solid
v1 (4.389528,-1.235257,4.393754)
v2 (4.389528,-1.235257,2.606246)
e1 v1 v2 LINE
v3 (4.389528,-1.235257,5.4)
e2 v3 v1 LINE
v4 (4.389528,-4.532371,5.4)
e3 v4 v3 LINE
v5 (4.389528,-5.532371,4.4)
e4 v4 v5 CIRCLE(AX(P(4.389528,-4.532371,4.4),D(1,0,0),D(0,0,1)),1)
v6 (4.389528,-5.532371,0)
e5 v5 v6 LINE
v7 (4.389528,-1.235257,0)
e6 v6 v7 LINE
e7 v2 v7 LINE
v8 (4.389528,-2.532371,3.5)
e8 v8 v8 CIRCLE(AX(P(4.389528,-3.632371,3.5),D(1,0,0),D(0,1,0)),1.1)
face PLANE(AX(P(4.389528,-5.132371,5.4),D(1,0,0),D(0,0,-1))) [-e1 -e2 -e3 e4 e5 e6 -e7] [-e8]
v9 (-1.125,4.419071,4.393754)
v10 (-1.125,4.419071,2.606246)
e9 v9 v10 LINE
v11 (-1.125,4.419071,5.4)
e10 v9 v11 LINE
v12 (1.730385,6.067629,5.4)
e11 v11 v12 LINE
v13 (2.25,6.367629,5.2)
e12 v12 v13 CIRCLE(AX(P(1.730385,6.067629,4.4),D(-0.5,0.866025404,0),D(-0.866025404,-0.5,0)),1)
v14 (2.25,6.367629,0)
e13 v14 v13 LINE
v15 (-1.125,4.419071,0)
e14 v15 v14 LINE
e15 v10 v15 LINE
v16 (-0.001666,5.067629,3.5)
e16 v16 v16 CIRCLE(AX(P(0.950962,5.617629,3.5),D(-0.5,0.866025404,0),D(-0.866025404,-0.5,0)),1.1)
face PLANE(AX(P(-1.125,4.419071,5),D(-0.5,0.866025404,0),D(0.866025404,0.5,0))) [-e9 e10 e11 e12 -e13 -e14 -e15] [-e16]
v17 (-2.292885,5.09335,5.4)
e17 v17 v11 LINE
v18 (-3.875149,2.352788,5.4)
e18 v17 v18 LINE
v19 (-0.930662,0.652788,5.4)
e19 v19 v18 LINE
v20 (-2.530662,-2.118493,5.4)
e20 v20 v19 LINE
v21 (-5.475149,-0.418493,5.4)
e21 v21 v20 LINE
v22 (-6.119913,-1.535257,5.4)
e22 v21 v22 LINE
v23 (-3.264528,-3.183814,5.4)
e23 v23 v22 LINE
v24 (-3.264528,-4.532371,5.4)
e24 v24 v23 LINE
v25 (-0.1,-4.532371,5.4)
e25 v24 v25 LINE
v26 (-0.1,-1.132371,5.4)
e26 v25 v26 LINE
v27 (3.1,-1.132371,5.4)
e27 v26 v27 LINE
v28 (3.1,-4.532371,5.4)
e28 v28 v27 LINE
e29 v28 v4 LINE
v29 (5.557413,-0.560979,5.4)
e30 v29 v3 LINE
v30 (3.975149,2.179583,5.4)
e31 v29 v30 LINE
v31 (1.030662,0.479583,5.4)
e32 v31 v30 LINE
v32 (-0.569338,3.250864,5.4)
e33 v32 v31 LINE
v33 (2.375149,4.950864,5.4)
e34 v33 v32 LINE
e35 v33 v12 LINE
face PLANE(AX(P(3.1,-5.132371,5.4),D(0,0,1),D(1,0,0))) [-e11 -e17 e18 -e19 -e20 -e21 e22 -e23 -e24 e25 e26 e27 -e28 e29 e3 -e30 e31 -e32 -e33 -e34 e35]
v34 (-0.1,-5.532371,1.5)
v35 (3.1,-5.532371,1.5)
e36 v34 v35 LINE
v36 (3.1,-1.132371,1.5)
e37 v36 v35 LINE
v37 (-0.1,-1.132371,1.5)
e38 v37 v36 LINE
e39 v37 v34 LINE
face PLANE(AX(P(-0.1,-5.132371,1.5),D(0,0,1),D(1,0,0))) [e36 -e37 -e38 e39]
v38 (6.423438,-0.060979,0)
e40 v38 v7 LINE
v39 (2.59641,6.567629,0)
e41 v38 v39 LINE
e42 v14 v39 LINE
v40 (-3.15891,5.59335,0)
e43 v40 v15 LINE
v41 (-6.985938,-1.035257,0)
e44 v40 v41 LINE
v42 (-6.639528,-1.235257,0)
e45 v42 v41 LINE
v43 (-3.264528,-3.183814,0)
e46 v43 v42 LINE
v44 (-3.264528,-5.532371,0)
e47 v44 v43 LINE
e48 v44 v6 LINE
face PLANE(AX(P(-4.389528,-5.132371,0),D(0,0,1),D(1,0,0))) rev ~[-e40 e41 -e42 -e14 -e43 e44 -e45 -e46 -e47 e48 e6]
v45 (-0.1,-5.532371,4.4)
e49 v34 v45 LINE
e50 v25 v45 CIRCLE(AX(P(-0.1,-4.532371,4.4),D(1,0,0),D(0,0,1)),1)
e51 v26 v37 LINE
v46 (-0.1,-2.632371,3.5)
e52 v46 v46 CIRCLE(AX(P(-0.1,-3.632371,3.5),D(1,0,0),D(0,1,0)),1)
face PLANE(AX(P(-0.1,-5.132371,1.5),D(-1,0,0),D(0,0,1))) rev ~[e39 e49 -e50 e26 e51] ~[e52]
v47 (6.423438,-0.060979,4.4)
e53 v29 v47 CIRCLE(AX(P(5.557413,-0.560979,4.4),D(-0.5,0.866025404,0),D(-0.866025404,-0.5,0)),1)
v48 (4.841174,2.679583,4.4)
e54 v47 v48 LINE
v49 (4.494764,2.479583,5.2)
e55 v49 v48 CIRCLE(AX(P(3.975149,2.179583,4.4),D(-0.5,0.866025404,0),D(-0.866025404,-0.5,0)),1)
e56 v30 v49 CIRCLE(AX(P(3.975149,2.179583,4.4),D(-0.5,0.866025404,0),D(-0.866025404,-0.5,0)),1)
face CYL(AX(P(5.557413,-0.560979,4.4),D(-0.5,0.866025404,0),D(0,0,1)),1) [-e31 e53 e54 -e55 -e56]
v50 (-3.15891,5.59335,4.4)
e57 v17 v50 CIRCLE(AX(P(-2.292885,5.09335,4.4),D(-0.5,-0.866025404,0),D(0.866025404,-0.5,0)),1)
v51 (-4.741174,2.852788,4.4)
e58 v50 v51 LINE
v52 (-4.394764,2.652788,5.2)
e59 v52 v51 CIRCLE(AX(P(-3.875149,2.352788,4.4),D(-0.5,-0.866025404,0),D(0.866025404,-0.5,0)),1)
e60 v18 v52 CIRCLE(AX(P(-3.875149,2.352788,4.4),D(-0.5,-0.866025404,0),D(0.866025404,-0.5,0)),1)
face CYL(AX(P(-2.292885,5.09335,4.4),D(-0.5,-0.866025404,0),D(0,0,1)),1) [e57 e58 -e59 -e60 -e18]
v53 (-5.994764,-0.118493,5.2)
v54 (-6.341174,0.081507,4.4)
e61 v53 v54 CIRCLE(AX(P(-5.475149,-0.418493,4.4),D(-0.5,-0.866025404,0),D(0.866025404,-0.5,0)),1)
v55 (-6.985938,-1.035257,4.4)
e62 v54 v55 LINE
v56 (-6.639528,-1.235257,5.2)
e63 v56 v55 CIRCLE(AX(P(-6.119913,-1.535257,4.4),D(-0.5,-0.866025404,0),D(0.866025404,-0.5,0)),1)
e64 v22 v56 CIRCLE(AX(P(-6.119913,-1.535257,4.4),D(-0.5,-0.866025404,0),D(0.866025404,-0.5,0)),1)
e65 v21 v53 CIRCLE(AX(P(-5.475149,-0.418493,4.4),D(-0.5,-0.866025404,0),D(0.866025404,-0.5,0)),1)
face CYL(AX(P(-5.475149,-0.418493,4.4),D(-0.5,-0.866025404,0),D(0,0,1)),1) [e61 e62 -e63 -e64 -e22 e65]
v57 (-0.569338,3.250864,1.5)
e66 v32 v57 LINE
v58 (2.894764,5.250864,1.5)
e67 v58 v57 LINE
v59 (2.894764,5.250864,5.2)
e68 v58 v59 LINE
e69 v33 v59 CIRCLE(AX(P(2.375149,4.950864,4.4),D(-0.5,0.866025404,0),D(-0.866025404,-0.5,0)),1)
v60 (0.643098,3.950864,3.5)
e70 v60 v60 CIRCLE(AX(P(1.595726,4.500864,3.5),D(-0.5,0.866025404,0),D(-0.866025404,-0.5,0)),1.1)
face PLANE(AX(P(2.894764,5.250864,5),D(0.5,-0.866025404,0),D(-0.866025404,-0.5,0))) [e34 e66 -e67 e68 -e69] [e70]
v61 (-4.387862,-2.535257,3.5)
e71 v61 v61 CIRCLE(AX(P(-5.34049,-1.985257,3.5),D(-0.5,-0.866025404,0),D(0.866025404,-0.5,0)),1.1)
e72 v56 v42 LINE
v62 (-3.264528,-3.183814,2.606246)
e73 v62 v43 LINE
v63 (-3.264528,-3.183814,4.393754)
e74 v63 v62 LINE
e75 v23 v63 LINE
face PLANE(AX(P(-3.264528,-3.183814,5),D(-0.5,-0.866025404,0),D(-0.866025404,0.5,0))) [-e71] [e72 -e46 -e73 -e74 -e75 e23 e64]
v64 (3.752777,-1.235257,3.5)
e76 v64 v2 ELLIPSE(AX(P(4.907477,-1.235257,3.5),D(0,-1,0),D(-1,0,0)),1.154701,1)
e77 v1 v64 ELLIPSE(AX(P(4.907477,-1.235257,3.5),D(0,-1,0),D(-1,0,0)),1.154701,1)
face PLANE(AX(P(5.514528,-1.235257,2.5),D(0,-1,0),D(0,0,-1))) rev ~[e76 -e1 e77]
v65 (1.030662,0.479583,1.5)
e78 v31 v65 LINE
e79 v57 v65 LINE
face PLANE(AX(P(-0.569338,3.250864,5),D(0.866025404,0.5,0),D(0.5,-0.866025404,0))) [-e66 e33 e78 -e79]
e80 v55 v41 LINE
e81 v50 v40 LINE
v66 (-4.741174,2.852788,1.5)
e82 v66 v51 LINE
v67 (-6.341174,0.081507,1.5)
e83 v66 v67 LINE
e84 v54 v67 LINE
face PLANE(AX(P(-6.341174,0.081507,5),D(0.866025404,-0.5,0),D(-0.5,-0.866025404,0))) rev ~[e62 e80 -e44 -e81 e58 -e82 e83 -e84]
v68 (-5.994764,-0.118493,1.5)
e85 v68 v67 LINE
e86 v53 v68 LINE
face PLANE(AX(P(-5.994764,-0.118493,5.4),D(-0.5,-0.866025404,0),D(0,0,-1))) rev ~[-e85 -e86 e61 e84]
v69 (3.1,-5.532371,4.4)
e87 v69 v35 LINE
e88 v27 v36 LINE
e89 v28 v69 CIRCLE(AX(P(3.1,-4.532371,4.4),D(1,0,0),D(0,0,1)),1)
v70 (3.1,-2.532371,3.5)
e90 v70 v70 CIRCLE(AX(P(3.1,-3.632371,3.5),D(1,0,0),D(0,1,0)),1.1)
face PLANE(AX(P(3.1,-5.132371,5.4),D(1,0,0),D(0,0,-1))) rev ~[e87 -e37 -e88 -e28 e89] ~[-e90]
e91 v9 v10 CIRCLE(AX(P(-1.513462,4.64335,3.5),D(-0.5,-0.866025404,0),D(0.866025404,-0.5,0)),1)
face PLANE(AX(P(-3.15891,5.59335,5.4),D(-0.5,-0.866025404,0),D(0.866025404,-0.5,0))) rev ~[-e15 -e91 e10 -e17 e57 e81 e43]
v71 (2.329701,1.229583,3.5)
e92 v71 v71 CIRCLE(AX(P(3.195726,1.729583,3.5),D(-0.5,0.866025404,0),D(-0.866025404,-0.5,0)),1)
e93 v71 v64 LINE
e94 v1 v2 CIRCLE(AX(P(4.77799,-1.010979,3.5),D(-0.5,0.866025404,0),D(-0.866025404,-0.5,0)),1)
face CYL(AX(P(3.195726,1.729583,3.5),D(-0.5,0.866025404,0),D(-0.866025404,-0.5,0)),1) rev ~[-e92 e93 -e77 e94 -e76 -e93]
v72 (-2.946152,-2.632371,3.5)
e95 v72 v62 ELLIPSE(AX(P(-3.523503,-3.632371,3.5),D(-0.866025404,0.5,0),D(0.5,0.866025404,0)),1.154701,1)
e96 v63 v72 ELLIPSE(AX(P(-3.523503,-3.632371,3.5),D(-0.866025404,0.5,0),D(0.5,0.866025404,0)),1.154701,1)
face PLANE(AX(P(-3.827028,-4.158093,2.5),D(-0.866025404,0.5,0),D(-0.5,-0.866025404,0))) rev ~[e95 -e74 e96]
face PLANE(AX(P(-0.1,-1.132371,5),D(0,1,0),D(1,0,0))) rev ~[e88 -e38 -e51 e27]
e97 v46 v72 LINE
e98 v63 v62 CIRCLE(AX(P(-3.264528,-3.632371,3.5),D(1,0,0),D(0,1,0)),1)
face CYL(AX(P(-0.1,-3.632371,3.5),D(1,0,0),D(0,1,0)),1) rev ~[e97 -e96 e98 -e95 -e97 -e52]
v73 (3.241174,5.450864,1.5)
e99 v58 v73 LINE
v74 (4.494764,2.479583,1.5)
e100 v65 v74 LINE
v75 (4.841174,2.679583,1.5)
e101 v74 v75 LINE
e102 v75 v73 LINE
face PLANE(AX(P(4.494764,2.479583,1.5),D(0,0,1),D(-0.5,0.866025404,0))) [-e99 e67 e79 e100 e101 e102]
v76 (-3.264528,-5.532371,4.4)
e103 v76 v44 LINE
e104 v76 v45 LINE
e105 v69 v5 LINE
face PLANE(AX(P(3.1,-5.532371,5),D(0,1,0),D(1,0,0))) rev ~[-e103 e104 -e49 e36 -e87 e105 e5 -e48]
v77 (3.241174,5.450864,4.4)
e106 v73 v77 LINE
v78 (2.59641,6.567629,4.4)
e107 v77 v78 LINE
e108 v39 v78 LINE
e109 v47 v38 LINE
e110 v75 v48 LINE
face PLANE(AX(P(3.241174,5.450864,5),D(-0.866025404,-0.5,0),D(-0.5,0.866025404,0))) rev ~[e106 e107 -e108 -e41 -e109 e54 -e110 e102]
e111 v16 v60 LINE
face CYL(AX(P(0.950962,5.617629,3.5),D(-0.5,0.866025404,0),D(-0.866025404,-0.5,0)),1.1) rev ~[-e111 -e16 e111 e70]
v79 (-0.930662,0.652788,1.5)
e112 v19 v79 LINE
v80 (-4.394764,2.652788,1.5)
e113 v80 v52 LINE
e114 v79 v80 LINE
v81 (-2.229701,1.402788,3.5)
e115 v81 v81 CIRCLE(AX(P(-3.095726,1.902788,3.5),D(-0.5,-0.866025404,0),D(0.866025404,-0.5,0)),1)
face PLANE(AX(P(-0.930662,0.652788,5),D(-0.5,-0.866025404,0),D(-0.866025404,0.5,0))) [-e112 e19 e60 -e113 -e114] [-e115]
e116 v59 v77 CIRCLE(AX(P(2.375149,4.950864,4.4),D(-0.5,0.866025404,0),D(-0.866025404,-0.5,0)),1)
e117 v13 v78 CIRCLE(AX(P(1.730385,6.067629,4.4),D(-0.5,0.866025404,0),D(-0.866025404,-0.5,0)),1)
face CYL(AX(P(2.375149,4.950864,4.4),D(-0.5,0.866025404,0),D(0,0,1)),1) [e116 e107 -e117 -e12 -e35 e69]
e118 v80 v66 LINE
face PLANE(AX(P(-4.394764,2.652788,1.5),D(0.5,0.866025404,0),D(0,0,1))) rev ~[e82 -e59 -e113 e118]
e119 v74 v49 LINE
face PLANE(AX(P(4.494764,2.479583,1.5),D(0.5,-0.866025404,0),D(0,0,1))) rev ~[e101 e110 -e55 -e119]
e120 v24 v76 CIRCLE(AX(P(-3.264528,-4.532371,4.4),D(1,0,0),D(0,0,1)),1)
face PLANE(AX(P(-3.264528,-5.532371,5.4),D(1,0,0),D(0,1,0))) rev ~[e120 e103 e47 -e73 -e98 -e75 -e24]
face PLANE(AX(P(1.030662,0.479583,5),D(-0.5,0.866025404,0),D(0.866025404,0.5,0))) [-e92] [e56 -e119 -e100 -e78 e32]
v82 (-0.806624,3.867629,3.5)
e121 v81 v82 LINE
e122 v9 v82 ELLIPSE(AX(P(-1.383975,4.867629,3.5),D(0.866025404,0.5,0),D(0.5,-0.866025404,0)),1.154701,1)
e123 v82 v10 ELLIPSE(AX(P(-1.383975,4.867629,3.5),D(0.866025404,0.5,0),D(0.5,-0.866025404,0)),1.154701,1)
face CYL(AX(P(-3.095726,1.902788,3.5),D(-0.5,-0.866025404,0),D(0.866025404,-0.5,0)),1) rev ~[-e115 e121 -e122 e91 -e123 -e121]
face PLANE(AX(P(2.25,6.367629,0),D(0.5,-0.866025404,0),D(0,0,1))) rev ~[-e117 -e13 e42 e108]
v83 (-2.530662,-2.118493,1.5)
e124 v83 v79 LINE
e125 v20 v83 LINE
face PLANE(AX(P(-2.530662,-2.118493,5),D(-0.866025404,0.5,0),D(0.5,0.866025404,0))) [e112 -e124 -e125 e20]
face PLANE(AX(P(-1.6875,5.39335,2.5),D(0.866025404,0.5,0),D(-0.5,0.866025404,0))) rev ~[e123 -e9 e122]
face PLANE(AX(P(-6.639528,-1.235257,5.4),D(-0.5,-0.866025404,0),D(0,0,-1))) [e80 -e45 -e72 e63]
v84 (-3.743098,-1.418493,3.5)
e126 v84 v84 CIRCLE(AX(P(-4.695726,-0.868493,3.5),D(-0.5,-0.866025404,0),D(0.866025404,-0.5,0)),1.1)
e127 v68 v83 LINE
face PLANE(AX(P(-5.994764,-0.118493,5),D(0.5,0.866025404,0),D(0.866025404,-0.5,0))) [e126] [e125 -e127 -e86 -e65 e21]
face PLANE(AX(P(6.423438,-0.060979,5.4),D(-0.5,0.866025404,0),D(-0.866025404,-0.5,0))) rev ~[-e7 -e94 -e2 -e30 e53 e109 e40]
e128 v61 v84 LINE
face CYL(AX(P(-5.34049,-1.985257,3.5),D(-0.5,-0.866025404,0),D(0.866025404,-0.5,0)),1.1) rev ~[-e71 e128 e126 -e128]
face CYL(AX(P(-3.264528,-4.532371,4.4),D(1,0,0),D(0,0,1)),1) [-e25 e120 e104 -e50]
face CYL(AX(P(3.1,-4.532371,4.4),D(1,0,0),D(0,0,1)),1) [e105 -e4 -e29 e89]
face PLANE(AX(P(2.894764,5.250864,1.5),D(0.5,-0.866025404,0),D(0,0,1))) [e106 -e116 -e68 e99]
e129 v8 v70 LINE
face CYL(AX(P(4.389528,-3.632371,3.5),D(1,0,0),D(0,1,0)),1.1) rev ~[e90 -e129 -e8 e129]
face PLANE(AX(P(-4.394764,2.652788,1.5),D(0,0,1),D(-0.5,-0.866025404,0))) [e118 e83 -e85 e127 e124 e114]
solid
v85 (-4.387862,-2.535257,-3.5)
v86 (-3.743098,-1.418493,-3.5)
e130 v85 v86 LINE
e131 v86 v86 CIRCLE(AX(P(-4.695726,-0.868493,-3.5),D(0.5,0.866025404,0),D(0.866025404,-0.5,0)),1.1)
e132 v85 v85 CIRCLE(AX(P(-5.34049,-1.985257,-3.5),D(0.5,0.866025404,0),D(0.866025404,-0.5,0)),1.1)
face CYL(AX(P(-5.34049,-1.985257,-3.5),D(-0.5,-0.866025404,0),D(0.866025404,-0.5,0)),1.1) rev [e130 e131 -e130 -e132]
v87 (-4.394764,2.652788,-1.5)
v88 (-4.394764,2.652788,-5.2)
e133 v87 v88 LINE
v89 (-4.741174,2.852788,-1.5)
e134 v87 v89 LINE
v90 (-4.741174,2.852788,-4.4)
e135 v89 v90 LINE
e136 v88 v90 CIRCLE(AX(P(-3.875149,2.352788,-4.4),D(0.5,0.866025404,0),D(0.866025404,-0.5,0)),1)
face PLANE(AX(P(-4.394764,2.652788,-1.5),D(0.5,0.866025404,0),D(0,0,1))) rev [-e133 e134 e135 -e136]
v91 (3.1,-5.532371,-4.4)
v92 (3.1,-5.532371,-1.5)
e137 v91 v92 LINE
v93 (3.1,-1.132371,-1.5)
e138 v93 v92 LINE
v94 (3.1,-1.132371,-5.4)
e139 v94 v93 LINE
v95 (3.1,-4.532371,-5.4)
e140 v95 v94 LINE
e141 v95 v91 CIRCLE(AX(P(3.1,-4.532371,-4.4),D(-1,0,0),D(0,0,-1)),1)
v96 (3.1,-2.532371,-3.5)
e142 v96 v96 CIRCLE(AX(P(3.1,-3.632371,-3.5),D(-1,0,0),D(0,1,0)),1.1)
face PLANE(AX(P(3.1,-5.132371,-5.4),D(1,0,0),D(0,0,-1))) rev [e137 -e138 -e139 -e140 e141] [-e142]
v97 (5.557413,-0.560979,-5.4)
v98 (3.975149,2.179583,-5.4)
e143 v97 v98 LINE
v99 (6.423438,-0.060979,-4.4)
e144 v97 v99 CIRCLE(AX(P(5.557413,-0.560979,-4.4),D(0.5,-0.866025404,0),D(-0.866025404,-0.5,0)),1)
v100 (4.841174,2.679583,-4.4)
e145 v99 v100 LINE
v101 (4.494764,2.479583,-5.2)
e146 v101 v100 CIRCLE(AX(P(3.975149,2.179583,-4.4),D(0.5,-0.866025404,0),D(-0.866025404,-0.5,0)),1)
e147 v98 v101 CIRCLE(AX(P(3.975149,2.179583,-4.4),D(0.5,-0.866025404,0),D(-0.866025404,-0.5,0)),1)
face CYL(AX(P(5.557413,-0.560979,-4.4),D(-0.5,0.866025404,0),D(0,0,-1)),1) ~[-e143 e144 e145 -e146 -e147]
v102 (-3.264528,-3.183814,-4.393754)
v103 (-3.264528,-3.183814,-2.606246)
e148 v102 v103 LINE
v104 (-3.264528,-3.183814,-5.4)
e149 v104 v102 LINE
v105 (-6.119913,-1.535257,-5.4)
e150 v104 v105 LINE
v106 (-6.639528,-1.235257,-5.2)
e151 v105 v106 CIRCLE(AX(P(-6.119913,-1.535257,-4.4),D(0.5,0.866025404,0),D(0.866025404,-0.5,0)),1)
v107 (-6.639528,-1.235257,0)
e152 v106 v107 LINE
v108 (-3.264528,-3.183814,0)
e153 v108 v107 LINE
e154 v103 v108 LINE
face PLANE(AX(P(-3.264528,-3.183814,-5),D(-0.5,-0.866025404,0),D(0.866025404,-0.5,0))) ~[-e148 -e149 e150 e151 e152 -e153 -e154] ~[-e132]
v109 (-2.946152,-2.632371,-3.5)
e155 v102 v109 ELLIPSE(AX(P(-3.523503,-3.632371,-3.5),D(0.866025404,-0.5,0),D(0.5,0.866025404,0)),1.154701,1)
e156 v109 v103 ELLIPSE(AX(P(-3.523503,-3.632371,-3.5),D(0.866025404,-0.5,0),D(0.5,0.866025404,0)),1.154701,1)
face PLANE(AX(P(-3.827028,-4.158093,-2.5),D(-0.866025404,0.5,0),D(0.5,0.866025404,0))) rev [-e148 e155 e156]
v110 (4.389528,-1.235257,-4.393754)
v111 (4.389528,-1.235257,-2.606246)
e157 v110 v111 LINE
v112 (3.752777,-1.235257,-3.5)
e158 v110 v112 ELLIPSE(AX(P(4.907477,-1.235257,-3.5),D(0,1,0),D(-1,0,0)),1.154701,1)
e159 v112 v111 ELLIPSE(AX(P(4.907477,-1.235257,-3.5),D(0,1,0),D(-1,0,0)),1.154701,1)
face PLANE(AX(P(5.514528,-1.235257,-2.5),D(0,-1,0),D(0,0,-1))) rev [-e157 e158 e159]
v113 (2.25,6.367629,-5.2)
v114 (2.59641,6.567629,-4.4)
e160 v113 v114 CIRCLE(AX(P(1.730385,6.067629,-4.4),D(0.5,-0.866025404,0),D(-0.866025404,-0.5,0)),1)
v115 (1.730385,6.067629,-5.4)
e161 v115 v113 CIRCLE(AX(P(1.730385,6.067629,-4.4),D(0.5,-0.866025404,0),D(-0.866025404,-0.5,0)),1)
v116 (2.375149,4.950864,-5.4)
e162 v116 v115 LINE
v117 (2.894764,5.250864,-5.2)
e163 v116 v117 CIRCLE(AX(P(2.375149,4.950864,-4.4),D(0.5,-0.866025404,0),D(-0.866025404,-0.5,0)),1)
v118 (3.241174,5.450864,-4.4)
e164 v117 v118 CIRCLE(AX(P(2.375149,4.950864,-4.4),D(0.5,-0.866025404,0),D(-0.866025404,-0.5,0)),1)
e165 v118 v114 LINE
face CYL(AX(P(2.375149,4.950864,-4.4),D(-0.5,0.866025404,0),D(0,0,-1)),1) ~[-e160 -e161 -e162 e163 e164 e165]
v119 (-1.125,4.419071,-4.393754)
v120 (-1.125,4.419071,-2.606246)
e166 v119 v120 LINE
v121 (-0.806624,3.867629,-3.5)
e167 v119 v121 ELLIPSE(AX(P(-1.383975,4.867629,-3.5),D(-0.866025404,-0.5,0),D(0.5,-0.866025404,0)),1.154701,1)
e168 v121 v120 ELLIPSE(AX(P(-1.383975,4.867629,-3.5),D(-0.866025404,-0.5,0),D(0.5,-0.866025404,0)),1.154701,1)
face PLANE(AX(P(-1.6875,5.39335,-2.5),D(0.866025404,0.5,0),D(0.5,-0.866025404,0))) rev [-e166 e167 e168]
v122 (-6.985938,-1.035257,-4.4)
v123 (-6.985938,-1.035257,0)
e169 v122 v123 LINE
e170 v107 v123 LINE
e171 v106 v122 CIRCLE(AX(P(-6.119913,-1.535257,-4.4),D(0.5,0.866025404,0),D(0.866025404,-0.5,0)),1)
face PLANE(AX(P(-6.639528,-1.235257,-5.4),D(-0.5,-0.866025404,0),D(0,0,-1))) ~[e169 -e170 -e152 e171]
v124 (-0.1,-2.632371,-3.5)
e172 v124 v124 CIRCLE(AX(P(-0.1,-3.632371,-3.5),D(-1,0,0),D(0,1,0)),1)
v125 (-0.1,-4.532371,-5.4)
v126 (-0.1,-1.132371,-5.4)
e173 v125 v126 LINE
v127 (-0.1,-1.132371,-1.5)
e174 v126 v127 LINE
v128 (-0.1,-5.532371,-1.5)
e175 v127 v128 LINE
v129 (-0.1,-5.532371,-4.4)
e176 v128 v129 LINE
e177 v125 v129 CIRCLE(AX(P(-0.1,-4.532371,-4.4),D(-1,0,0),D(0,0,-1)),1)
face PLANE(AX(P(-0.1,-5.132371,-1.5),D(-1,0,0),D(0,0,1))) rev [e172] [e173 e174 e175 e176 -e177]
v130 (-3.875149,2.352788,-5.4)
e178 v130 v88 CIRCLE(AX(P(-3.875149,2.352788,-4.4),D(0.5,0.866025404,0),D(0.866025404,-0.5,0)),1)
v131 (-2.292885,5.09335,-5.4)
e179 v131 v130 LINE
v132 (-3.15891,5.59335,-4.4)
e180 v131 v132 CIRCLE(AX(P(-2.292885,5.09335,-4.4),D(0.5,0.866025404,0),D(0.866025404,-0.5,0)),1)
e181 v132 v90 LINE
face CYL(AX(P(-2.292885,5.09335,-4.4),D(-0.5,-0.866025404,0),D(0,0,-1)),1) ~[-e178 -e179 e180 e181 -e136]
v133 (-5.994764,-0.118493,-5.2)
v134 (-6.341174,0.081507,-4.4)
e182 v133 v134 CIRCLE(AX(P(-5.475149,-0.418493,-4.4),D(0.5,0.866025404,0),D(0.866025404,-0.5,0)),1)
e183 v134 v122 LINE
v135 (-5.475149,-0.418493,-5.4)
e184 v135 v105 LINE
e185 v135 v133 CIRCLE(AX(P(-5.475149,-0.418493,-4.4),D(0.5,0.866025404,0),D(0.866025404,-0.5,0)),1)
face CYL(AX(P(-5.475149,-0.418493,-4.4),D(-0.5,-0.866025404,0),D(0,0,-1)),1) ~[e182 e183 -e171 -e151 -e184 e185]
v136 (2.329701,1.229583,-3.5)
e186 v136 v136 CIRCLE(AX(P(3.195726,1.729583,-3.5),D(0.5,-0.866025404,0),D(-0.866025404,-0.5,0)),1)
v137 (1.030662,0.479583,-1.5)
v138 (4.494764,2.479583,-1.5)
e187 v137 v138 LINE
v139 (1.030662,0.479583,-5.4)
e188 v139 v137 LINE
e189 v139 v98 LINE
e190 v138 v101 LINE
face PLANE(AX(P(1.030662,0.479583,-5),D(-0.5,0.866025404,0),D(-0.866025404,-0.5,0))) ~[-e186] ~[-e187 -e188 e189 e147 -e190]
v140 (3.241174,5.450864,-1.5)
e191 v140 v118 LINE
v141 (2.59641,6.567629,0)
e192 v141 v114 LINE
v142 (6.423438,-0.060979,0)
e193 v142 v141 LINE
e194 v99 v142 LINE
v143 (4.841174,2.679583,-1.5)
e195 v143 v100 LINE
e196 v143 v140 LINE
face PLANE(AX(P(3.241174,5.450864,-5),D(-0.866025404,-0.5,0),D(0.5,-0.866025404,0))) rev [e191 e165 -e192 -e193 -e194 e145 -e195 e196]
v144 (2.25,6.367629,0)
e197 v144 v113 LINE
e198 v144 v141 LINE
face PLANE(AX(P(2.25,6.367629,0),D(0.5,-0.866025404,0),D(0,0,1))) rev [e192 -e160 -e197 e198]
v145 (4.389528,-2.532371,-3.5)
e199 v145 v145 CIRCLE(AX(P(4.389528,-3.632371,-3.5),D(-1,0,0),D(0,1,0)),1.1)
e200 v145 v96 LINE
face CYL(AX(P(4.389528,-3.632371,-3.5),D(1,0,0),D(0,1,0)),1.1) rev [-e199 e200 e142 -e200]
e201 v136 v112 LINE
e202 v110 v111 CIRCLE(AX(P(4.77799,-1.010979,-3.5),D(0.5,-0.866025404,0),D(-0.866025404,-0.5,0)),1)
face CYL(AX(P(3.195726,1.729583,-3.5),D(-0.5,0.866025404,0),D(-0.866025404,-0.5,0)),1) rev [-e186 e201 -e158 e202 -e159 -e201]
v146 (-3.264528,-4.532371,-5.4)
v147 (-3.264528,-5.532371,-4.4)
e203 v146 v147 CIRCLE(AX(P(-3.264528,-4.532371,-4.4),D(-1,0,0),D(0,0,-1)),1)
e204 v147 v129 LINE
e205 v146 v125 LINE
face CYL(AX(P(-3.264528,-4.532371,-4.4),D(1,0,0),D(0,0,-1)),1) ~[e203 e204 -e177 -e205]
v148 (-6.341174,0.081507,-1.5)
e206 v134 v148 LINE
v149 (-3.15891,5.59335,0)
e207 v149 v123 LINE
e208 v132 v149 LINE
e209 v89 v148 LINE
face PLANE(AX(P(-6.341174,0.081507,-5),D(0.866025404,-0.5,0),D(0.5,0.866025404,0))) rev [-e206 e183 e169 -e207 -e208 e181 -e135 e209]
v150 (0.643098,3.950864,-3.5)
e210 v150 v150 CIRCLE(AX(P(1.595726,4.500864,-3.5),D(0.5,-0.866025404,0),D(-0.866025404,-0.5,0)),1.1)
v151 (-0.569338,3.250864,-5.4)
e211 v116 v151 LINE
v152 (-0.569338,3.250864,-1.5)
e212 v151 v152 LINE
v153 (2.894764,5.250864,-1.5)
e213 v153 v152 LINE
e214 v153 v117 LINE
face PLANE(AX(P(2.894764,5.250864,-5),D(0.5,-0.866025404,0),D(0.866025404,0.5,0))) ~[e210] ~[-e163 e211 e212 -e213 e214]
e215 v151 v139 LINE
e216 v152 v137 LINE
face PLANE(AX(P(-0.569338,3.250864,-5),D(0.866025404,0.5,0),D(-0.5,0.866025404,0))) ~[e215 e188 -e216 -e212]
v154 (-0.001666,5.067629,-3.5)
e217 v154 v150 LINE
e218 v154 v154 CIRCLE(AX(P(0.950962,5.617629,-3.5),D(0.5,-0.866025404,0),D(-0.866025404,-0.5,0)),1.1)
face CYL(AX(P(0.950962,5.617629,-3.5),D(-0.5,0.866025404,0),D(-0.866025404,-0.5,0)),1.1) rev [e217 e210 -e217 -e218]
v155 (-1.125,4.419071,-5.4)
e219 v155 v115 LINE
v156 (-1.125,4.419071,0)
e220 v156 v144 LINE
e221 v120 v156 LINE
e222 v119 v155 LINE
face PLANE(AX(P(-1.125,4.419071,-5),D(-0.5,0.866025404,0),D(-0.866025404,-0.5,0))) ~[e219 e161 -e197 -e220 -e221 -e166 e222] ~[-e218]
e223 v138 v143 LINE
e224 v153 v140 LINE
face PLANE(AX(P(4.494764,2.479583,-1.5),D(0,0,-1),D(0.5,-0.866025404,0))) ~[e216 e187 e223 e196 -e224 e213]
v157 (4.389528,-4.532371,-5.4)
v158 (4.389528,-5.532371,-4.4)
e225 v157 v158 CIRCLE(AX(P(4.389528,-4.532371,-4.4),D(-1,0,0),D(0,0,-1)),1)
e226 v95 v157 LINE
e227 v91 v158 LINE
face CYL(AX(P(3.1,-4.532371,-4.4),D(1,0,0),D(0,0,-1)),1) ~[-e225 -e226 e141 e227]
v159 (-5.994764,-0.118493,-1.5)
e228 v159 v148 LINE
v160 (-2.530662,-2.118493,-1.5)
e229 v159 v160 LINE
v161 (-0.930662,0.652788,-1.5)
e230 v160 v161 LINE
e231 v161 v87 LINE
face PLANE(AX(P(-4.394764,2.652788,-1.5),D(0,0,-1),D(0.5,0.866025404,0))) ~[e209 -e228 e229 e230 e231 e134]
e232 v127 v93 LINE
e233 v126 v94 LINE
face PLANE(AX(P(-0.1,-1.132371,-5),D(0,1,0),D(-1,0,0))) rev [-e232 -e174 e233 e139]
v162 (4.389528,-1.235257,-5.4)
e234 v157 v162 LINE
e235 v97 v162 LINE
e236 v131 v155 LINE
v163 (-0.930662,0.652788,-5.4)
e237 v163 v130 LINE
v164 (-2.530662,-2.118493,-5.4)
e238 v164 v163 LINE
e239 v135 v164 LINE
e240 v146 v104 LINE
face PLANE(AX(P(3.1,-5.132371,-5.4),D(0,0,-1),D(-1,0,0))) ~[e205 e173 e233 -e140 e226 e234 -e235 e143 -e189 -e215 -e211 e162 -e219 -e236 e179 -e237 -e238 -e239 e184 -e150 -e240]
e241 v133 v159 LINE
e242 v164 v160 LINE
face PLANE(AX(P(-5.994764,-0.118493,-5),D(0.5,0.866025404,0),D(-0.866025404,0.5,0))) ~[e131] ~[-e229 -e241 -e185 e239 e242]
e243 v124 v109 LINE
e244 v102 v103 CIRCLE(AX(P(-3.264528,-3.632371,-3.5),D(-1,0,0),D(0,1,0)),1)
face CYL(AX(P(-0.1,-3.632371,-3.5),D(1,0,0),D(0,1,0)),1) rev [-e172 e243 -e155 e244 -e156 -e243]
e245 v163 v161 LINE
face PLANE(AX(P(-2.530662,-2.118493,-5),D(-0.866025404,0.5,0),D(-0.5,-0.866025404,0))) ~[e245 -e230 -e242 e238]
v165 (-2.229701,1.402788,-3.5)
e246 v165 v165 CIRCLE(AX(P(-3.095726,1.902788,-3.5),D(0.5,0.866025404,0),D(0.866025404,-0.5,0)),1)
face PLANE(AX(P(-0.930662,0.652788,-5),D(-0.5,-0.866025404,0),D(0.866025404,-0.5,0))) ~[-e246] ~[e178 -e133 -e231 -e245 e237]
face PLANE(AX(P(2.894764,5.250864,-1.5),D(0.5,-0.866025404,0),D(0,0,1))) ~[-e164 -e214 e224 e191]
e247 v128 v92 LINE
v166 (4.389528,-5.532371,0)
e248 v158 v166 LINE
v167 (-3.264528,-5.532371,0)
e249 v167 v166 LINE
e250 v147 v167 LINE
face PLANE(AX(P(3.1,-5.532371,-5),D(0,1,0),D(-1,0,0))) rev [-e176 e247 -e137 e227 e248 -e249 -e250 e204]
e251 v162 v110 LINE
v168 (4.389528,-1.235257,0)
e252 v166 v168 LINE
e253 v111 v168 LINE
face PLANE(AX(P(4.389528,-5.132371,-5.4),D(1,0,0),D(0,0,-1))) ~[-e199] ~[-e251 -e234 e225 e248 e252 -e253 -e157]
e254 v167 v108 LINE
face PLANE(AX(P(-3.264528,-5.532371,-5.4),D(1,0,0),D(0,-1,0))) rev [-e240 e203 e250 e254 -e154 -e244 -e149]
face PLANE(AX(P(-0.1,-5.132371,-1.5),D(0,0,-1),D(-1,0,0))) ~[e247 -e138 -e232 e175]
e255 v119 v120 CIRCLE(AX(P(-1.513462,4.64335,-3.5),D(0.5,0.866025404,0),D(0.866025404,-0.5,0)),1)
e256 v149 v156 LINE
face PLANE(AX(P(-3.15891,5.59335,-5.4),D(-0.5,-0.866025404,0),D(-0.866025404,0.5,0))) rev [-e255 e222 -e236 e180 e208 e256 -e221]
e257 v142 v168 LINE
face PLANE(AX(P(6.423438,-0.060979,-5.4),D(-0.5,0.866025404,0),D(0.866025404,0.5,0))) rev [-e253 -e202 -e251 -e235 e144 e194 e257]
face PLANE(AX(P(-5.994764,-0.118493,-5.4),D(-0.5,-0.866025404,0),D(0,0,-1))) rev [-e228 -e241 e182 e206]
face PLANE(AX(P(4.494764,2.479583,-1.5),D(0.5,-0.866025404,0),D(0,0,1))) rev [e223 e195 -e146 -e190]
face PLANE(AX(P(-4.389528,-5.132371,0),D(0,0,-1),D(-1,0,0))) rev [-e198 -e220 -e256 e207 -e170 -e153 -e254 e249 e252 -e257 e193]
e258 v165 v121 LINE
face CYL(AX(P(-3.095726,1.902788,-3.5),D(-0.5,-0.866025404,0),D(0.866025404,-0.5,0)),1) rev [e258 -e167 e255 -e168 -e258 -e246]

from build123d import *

# Parameters (mm, degrees)
F1_DEPTH  = 5
F2_W      = 3.2
F2_H      = 4
F3_DEPTH  = 3.5
F4_W      = 2.25
F4_H      = 3.897114317
F5_DEPTH  = 5
F6_R      = 1.1
F8_DEPTH  = 1.2895280957
F7_R      = 1.1
F10_DEPTH = 1.2895280957
F9_R      = 1.1
F11_DEPTH = 1.2895280957
F12_R     = 1
F15_REACH = 9.3689552204
F13_R     = 1
F16_REACH = 10.4939552204
F14_R     = 1
F17_REACH = 11.5637192683
F18_DEPTH = 0.4
F19_DEPTH = 0.4
F20_DEPTH = 0.4
F21_DEPTH = 0.4
F22_W     = 1.125
F22_H     = 2.3485571585
F23_DEPTH = 5.4
F24_R     = 1


with BuildPart() as f1:
    # F0 (on Top) → F1 (new body)
    with BuildSketch(Plane.XY):
        Polygon((2.25, 6.367628561), (-2.25, 6.367628561), (-6.6395280957, -1.235257122), (-4.3895280957, -5.132371439), (4.3895280957, -5.132371439), (6.6395280957, -1.235257122), align=None)
    extrude(amount=F1_DEPTH)

    # F2 (on face) → F3 (cut)
    with BuildSketch(Plane.XY.offset(5)):
        with Locations((1.5, -3.132371439)):
            Rectangle(F2_W, F2_H)
        Polygon((4.4947640478, 2.4795831791), (2.8947640478, 5.2508644712), (-0.5693375673, 3.2508644712), (1.0306624327, 0.4795831791), align=None)
        Polygon((-4.3947640478, 2.6527882599), (-5.9947640478, -0.1184930322), (-2.5306624327, -2.1184930322), (-0.9306624327, 0.6527882599), align=None)
    extrude(amount=-F3_DEPTH, mode=Mode.SUBTRACT)

    # F4 (on face) → F5 (cut, through all)
    with BuildSketch(Plane.XY.offset(5)):
        with Locations((5.5145280957, -3.1838142805)):
            Rectangle(F4_W, F4_H)
        Polygon((-1.125, 4.4190714025), (2.25, 6.367628561), (1.125, 8.3161857195), (-2.25, 6.367628561), align=None)
        Polygon((-3.2645280957, -3.1838142805), (-6.6395280957, -1.235257122), (-7.7645280957, -3.1838142805), (-4.3895280957, -5.132371439), align=None)
    extrude(amount=-F5_DEPTH, mode=Mode.SUBTRACT)

    # F6 (on face) → F8 (cut, through all)
    with BuildSketch(Plane(origin=(-2.1947640478, -3.8014428415, 0), x_dir=(0.8660254038, -0.5, 0), z_dir=(-0.5, -0.8660254038, 0))):
        with Locations((-3.632371439, 3.5)):
            Circle(F6_R)
    extrude(amount=-F8_DEPTH, mode=Mode.SUBTRACT)

    # F7 (on face) → F10 (cut, through all)
    with BuildSketch(Plane.YZ.offset(4.3895280957)):
        with Locations((-3.632371439, 3.5)):
            Circle(F7_R)
    extrude(amount=-F10_DEPTH, mode=Mode.SUBTRACT)

    # F9 (on face) → F11 (cut, through all)
    with BuildSketch(Plane(origin=(-2.1947640478, 3.8014428415, 0), x_dir=(-0.8660254038, -0.5, 0), z_dir=(-0.5, 0.8660254038, 0))):
        with Locations((-3.632371439, 3.5)):
            Circle(F9_R)
    extrude(amount=-F11_DEPTH, mode=Mode.SUBTRACT)

    f15_end = Plane(origin=(-3.8270280957, -4.1580928598, 2.5), x_dir=(-0.5, -0.8660254038, 0), z_dir=(-0.8660254038, 0.5, 0))
    # F12 (on face) → F15 (cut, up to a plane its end follows)
    with BuildSketch(Plane.YZ.offset(-0.1)):
        with Locations((-3.632371439, 3.5)):
            Circle(F12_R)
    f15_long = extrude(amount=-F15_REACH, mode=Mode.PRIVATE)
    add(split(f15_long, bisect_by=f15_end, keep=Keep.BOTTOM, mode=Mode.PRIVATE), mode=Mode.SUBTRACT)

    f16_end = Plane(origin=(5.5145280957, -1.235257122, 2.5), x_dir=(0, 0, -1), z_dir=(0, -1, 0))
    # F13 (on face) → F16 (cut, up to a plane its end follows)
    with BuildSketch(Plane(origin=(0.05, -0.0866025404, 0), x_dir=(-0.8660254038, -0.5, 0), z_dir=(-0.5, 0.8660254038, 0))):
        with Locations((-3.632371439, 3.5)):
            Circle(F13_R)
    f16_long = extrude(amount=-F16_REACH, mode=Mode.PRIVATE)
    add(split(f16_long, bisect_by=f16_end, keep=Keep.BOTTOM, mode=Mode.PRIVATE), mode=Mode.SUBTRACT)

    f17_end = Plane(origin=(-1.6875, 5.3933499817, 2.5), x_dir=(-0.5, 0.8660254038, 0), z_dir=(0.8660254038, 0.5, 0))
    # F14 (on face) → F17 (cut, up to a plane its end follows)
    with BuildSketch(Plane(origin=(0.05, 0.0866025404, 0), x_dir=(0.8660254038, -0.5, 0), z_dir=(-0.5, -0.8660254038, 0))):
        with Locations((-3.632371439, 3.5)):
            Circle(F14_R)
    f17_long = extrude(amount=-F17_REACH, mode=Mode.PRIVATE)
    add(split(f17_long, bisect_by=f17_end, keep=Keep.BOTTOM, mode=Mode.PRIVATE), mode=Mode.SUBTRACT)

    # F18 (add): a face of the model
    f18_faces = [f1.faces().sort_by_distance(p)[0] for p in [
        (0, 0, 5),
    ]]
    extrude(f18_faces, amount=F18_DEPTH)

    # F19 (add): a face of the model
    f19_faces = [f1.faces().sort_by_distance(p)[0] for p in [
        (4.7127523056, 2.1020164412, 2.4320117422),
    ]]
    extrude(f19_faces, amount=F19_DEPTH)

    # F20 (add): a face of the model
    f20_faces = [f1.faces().sort_by_distance(p)[0] for p in [
        (-4.1767757901, 3.0303549978, 2.4320117422),
    ]]
    extrude(f20_faces, amount=F20_DEPTH)

    # F21 (add): a face of the model
    f21_faces = [f1.faces().sort_by_distance(p)[0] for p in [
        (-0.5359765155, -5.132371439, 2.4320117422),
    ]]
    extrude(f21_faces, amount=F21_DEPTH)

    # F22 (on face) → F23 (cut, through all)
    with BuildSketch(Plane.XY.offset(5.4)):
        with Locations((-3.8270280957, -4.3580928598)):
            Rectangle(F22_W, F22_H)
        Polygon((6.4234382572, -0.0609785427), (4.3895280957, -1.235257122), (4.9520280957, -2.2095357012), (6.9859382572, -1.035257122), align=None)
        Polygon((-3.1589101615, 5.5933499817), (-1.125, 4.4190714025), (-0.5625, 5.3933499817), (-2.5964101615, 6.567628561), align=None)
    extrude(amount=-F23_DEPTH, mode=Mode.SUBTRACT)

    # F24
    f24_edges = [f1.edges().sort_by_distance(p)[0] for p in [
        (-1.682264, -5.532371, 5.4),
        (3.744764, -5.532371, 5.4),
        (5.632306, 1.309302, 5.4),
        (2.918792, 6.009247, 5.4),
        (-3.950042, 4.223069, 5.4),
        (-6.663556, -0.476875, 5.4),
    ]]
    fillet(f24_edges, radius=F24_R)


with BuildPart() as f25_1:
    # F25: instance of F1
    add(f1.part.mirror(Plane.XY))


solid = Compound([f1.part, f25_1.part])
